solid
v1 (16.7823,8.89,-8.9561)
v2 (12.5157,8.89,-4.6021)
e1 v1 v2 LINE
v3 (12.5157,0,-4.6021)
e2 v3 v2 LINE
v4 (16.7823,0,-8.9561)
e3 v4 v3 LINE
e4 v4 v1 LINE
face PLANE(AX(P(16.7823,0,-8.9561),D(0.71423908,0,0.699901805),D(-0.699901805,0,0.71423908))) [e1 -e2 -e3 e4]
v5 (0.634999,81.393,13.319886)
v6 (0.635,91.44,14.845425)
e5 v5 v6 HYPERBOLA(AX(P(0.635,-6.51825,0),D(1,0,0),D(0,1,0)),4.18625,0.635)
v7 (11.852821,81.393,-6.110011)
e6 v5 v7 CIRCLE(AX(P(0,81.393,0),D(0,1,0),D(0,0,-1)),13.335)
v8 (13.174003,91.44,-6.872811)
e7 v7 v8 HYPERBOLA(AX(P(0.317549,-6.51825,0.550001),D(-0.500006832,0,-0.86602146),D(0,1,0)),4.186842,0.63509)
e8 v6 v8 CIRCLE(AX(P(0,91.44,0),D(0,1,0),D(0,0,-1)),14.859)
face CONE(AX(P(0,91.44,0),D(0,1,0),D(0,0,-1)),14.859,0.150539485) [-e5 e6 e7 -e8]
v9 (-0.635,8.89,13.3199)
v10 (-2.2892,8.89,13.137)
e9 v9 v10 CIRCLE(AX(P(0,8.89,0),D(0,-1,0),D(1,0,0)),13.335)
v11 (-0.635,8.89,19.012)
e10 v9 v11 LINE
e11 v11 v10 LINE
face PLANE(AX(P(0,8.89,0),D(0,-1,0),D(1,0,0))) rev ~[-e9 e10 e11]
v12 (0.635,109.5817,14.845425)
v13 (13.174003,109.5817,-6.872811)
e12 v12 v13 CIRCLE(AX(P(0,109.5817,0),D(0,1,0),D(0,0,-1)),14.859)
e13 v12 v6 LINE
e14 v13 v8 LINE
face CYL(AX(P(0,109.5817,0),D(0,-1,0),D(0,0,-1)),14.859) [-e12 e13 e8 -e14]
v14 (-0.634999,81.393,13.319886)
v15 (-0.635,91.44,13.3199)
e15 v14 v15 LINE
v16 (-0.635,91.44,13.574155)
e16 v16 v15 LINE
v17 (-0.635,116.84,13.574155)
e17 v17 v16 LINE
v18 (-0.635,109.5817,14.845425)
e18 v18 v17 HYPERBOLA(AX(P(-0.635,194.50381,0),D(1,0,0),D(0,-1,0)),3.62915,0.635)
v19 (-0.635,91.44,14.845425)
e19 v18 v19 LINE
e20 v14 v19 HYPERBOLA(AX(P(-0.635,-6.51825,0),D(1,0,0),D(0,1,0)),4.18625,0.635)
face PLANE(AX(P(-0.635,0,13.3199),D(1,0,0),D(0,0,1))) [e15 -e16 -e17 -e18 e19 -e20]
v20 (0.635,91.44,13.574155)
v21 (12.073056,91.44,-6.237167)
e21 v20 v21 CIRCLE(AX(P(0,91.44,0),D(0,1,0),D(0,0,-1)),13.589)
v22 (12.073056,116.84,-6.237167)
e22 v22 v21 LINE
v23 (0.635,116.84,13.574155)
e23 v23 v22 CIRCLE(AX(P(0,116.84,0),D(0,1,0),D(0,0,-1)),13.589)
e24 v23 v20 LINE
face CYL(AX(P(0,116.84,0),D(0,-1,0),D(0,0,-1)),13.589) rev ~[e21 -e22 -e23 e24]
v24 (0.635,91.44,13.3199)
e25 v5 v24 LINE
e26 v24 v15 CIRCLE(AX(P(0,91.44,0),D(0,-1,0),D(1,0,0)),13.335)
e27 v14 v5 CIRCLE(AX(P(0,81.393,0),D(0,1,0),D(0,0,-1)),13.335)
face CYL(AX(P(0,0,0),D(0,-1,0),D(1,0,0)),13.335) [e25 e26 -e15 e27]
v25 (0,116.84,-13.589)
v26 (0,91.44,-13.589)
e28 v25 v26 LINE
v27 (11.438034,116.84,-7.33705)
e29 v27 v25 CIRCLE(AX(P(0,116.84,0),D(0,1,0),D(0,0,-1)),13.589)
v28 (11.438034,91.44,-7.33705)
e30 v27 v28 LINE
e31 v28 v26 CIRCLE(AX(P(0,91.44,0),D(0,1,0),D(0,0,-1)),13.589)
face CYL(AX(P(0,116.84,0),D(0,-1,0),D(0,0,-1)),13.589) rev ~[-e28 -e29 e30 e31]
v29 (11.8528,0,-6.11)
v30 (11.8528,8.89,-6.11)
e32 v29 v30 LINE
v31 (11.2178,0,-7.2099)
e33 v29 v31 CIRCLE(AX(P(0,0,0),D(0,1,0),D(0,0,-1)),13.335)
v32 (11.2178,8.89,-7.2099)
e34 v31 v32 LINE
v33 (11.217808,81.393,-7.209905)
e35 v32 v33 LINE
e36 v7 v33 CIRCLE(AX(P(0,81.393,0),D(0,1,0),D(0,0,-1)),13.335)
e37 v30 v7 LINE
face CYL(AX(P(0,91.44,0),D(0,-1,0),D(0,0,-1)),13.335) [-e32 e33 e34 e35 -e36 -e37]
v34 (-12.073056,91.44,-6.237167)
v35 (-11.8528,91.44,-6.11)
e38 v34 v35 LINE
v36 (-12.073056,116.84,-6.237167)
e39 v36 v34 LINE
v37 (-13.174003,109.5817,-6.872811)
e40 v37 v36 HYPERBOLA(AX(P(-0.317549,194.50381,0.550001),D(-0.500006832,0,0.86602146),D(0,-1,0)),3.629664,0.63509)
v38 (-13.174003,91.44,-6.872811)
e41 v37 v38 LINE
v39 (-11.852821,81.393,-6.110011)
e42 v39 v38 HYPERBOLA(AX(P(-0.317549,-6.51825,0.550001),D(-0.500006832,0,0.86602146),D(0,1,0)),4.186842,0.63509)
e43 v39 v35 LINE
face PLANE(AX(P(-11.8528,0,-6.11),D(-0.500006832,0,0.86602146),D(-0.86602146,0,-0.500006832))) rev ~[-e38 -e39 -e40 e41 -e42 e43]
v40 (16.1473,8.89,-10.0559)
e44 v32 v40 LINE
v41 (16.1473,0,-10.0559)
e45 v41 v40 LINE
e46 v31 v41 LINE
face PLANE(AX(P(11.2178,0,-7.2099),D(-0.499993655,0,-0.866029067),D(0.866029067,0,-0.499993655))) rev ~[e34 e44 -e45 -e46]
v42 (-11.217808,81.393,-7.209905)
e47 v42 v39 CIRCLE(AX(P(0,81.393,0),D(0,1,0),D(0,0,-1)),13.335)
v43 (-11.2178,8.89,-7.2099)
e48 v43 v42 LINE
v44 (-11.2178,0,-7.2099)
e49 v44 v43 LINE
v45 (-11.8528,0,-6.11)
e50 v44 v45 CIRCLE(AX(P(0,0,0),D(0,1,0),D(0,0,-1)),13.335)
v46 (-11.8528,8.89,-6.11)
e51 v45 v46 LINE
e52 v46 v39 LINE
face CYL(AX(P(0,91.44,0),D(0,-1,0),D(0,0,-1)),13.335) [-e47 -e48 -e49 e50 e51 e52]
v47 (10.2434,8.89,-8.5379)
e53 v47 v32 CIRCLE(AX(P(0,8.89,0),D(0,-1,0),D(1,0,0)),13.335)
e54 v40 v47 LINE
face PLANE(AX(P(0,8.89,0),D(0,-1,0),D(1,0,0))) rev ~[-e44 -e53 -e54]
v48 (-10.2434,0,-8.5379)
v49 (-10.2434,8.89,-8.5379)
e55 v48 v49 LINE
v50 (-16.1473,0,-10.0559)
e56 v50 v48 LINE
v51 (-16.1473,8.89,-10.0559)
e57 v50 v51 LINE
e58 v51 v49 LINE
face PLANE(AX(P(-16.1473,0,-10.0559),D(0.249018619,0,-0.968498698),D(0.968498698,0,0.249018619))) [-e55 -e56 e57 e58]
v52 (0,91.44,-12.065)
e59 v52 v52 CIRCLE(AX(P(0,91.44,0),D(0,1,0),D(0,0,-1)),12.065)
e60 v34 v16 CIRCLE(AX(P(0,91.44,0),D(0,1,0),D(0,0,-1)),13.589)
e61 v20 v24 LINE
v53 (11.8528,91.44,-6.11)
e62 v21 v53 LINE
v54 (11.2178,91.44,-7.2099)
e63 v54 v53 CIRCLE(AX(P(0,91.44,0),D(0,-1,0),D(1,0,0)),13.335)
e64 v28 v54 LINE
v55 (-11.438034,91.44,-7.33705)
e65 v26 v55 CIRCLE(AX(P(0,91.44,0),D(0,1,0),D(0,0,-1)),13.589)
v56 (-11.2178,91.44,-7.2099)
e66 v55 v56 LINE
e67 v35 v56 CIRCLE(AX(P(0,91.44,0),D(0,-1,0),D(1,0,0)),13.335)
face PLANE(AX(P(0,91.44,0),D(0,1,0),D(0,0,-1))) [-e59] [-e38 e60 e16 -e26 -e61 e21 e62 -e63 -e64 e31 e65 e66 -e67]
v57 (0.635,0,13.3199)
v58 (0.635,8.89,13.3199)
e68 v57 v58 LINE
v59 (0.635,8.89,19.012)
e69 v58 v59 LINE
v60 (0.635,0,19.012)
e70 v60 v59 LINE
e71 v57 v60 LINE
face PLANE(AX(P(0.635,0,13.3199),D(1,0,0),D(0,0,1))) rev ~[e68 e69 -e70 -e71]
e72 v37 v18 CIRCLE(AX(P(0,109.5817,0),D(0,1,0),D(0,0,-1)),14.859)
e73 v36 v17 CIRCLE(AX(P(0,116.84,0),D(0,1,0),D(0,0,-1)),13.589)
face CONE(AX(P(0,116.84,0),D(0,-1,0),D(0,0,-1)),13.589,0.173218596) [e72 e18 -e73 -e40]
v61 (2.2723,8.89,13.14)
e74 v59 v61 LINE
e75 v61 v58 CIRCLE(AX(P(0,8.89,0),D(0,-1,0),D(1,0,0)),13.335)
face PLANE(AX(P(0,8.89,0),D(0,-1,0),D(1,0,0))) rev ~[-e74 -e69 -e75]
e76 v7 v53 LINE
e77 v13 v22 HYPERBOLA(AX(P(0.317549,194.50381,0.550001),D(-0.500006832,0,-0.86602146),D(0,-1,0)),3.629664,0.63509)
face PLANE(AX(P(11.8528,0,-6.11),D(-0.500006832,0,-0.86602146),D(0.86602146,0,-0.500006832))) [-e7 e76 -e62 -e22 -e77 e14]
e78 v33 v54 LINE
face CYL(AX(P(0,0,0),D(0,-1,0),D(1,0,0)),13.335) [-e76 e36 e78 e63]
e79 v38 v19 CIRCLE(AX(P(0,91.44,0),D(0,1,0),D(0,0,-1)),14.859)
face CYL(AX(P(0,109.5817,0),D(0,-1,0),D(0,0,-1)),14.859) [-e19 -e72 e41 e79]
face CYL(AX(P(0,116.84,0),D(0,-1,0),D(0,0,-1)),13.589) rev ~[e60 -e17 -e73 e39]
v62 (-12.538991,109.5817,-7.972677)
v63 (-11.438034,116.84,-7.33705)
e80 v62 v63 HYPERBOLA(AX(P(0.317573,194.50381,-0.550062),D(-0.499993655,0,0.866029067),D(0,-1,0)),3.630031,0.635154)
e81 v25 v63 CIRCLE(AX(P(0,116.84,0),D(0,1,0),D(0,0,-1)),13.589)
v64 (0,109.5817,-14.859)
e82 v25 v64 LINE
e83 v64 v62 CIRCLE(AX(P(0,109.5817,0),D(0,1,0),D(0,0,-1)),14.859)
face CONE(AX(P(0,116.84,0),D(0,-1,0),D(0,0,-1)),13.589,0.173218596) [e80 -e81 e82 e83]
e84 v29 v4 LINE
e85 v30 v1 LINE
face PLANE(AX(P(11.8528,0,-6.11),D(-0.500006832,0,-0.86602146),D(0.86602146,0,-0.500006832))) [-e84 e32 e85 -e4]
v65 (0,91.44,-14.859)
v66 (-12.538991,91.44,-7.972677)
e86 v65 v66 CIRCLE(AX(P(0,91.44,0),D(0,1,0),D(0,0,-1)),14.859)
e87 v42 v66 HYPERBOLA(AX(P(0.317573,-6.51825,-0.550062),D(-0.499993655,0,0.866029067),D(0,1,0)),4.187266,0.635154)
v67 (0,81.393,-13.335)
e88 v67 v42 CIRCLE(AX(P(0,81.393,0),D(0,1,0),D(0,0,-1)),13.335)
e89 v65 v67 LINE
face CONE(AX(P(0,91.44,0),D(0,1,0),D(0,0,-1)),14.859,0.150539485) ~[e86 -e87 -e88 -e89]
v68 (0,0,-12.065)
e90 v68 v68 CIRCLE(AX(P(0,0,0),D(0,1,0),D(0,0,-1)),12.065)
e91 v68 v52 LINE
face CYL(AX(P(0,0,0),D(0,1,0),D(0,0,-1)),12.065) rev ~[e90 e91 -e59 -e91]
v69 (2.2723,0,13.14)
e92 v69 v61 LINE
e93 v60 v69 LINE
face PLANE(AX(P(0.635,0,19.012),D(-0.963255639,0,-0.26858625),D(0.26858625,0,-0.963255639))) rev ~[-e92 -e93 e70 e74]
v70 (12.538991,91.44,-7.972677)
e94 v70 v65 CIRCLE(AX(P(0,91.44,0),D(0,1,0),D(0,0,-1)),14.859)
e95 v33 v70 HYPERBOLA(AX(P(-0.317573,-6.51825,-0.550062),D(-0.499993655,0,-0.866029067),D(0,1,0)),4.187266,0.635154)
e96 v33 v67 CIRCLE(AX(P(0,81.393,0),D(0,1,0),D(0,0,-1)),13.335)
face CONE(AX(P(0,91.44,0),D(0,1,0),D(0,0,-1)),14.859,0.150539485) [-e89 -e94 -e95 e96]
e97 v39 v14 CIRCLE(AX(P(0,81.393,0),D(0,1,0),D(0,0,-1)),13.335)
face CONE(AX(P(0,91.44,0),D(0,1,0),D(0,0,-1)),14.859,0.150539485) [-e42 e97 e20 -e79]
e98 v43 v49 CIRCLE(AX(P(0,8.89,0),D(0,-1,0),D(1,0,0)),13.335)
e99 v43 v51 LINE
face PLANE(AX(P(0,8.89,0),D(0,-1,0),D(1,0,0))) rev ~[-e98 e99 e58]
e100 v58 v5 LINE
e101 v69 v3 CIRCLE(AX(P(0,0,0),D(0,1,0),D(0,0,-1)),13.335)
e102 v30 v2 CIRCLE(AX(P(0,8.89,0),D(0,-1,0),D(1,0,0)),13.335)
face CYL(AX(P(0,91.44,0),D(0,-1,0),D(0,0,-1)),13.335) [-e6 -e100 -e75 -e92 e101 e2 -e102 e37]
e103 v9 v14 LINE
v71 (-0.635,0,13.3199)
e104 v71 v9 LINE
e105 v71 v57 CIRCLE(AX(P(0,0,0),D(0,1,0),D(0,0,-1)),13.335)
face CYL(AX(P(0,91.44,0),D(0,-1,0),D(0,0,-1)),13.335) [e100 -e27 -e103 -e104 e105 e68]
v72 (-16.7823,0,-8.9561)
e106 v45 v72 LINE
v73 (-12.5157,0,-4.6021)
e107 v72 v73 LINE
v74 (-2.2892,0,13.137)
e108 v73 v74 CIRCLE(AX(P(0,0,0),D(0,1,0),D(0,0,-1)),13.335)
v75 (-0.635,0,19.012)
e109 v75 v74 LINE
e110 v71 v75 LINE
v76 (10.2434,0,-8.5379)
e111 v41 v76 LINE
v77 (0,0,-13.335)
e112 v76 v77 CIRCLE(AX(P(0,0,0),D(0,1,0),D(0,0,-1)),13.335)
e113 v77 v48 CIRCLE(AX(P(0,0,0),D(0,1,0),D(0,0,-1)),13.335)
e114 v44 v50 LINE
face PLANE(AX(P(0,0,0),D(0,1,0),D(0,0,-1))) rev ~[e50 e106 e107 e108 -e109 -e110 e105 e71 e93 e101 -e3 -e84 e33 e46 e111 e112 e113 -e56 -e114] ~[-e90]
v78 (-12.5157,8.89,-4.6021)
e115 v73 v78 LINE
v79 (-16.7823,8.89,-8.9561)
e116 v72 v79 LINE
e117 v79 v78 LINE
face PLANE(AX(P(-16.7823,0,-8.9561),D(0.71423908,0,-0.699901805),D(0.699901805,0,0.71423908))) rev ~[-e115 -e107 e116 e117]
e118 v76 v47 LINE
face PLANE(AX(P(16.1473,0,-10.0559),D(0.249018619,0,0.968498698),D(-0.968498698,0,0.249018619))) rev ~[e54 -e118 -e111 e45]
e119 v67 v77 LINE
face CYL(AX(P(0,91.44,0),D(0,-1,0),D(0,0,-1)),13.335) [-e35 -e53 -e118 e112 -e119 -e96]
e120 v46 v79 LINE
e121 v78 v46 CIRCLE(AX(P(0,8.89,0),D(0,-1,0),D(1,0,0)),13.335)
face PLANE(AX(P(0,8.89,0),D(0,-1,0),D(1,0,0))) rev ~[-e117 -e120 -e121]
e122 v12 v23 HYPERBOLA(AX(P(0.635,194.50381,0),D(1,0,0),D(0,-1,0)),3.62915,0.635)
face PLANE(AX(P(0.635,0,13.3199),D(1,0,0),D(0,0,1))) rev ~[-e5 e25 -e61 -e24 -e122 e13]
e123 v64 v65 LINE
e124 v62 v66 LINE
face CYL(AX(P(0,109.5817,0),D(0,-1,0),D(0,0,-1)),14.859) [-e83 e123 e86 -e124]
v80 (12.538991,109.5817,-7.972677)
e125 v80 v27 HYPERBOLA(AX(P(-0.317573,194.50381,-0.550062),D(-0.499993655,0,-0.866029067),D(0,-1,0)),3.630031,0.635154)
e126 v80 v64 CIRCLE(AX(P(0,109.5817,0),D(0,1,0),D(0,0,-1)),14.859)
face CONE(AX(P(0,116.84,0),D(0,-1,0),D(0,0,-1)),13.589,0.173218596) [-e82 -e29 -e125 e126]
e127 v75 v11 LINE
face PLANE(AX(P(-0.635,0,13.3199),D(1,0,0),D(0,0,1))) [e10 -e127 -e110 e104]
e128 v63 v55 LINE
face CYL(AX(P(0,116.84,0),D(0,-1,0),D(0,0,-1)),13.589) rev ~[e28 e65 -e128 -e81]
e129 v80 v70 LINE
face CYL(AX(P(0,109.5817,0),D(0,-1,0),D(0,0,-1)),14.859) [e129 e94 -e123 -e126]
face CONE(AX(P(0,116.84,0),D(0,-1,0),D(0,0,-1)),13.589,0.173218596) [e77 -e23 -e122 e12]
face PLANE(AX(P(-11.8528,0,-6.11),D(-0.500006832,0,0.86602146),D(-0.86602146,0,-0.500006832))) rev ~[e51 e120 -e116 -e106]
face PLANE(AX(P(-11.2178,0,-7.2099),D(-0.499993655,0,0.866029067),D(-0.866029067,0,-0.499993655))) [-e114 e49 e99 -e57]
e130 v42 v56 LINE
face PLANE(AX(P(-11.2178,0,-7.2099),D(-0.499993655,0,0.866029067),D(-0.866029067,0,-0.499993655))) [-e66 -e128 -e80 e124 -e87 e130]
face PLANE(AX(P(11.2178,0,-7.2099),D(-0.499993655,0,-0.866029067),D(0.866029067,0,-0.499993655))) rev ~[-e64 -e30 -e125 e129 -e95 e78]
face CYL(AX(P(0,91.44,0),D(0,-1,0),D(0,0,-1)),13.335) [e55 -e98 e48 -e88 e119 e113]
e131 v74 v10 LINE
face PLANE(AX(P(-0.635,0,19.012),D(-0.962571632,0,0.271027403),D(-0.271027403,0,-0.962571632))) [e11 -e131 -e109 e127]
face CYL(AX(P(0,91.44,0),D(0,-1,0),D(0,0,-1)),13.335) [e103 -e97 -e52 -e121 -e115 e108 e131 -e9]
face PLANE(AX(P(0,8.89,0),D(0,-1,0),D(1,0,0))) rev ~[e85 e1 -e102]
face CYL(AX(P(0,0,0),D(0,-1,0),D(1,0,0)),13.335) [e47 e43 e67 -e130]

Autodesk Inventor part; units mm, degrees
ref_plane "YZ Plane" through (0, 0, 0) normal (1, 0, 0) x (0, 1, 0)
ref_plane "XZ Plane" through (0, 0, 0) normal (0, 1, 0) x (-1, 0, 0)
sketch "Sketch1" plane through (0, 0, 0) normal (1, 0, 0) x (0, 1, 0)
  line L0 (0, 0) -> (0, -12.065)
  line L1 (0, -12.065) -> (91.44, -12.065)
  line L2 (91.44, -13.335) -> (0, -13.335)
  line L3 (0, -13.335) -> (0, -12.065)
  line L4 (0, 0) -> (110.5631, 0)
  line L5 (116.84, 0) -> (116.84, -13.589)
  line L6 (116.84, -13.589) -> (91.44, -13.589)
  line L7 (116.84, -13.589) -> (142.24, -13.589) construction
  line L8 (109.5817, -14.859) -> (91.44, -14.859)
  line L9 (91.44, -14.859) -> (81.393, -13.335)
  line L10 (91.44, -13.589) -> (91.44, -12.065)
  line L11 (116.84, -13.589) -> (109.5817, -14.859)
  point P0 (73.3806, -13.335)
  dimension "d0" = 12.065
  dimension "d1" = 91.44
  dimension "d39" = 13.589
  dimension "d41" = 180
ref_plane "Work Plane1" through (0, 0, 0) normal (0, -1, 0) x (1, 0, 0)
sketch "Sketch2" plane through (0, 0, 0) normal (0, -1, 0) x (1, 0, 0)
  circle A0 centre (0, 0) radius 13.335
  line L0 (11.2178, -7.2099) -> (16.1473, -10.0559)
  line L1 (11.8528, -6.11) -> (16.7823, -8.9561)
  line L2 (0.635, 13.3199) -> (0.635, 19.012)
  line L3 (-0.635, 13.3199) -> (-0.635, 19.012)
  line L4 (-11.8528, -6.11) -> (-16.7823, -8.9561)
  line L5 (-11.2178, -7.2099) -> (-16.1473, -10.0559)
  line L6 (16.1473, -10.0559) -> (16.7823, -8.9561)
  line L7 (0.635, 19.012) -> (-0.635, 19.012)
  line L8 (-16.7823, -8.9561) -> (-16.1473, -10.0559)
  line L9 (-0.635, 19.012) -> (-2.2892, 13.137)
  circle A1 centre (0, 0) radius 13.335 projected
  line L10 (0.635, 19.012) -> (2.2723, 13.14)
  line L11 (16.7823, -8.9561) -> (12.5157, -4.6021)
  line L12 (-16.1473, -10.0559) -> (-10.2434, -8.5379)
  line L13 (-16.7823, -8.9561) -> (-12.5157, -4.6021)
  line L14 (16.1473, -10.0559) -> (10.2434, -8.5379)
  dimension "d24" = 6.096
  dimension "d25" = 6.096
  dimension "d27" = 6.096
  dimension "d28" = 6.096
  dimension "d29" = 6.096
extrude "Extrusion1" add sketch "Sketch2" against normal blind 8.89 contours A0 L2 L10 | L11 L1 A0 | A0 L9 L3 | L0 L14 A0 | A0 L4 L13 | L12 L5 A0
extrude "Extrusion2" cut sketch "Sketch2" against normal blind 124.7775 contours A0 L3 L7 L2 | L1 L6 L0 A0 | A0 L5 L8 L4
revolve "Revolution2" add sketch "Sketch1" angle 360 about axis through (0, 0, 0) along (0, 1, 0)
extrude "Extrusion3" cut sketch "Sketch2" against normal blind 174.625 contours A0 L3 L7 L2 | L1 L6 L0 A0 | A0 L5 L8 L4
properties part number "Engine_Holder_Mk_III"
